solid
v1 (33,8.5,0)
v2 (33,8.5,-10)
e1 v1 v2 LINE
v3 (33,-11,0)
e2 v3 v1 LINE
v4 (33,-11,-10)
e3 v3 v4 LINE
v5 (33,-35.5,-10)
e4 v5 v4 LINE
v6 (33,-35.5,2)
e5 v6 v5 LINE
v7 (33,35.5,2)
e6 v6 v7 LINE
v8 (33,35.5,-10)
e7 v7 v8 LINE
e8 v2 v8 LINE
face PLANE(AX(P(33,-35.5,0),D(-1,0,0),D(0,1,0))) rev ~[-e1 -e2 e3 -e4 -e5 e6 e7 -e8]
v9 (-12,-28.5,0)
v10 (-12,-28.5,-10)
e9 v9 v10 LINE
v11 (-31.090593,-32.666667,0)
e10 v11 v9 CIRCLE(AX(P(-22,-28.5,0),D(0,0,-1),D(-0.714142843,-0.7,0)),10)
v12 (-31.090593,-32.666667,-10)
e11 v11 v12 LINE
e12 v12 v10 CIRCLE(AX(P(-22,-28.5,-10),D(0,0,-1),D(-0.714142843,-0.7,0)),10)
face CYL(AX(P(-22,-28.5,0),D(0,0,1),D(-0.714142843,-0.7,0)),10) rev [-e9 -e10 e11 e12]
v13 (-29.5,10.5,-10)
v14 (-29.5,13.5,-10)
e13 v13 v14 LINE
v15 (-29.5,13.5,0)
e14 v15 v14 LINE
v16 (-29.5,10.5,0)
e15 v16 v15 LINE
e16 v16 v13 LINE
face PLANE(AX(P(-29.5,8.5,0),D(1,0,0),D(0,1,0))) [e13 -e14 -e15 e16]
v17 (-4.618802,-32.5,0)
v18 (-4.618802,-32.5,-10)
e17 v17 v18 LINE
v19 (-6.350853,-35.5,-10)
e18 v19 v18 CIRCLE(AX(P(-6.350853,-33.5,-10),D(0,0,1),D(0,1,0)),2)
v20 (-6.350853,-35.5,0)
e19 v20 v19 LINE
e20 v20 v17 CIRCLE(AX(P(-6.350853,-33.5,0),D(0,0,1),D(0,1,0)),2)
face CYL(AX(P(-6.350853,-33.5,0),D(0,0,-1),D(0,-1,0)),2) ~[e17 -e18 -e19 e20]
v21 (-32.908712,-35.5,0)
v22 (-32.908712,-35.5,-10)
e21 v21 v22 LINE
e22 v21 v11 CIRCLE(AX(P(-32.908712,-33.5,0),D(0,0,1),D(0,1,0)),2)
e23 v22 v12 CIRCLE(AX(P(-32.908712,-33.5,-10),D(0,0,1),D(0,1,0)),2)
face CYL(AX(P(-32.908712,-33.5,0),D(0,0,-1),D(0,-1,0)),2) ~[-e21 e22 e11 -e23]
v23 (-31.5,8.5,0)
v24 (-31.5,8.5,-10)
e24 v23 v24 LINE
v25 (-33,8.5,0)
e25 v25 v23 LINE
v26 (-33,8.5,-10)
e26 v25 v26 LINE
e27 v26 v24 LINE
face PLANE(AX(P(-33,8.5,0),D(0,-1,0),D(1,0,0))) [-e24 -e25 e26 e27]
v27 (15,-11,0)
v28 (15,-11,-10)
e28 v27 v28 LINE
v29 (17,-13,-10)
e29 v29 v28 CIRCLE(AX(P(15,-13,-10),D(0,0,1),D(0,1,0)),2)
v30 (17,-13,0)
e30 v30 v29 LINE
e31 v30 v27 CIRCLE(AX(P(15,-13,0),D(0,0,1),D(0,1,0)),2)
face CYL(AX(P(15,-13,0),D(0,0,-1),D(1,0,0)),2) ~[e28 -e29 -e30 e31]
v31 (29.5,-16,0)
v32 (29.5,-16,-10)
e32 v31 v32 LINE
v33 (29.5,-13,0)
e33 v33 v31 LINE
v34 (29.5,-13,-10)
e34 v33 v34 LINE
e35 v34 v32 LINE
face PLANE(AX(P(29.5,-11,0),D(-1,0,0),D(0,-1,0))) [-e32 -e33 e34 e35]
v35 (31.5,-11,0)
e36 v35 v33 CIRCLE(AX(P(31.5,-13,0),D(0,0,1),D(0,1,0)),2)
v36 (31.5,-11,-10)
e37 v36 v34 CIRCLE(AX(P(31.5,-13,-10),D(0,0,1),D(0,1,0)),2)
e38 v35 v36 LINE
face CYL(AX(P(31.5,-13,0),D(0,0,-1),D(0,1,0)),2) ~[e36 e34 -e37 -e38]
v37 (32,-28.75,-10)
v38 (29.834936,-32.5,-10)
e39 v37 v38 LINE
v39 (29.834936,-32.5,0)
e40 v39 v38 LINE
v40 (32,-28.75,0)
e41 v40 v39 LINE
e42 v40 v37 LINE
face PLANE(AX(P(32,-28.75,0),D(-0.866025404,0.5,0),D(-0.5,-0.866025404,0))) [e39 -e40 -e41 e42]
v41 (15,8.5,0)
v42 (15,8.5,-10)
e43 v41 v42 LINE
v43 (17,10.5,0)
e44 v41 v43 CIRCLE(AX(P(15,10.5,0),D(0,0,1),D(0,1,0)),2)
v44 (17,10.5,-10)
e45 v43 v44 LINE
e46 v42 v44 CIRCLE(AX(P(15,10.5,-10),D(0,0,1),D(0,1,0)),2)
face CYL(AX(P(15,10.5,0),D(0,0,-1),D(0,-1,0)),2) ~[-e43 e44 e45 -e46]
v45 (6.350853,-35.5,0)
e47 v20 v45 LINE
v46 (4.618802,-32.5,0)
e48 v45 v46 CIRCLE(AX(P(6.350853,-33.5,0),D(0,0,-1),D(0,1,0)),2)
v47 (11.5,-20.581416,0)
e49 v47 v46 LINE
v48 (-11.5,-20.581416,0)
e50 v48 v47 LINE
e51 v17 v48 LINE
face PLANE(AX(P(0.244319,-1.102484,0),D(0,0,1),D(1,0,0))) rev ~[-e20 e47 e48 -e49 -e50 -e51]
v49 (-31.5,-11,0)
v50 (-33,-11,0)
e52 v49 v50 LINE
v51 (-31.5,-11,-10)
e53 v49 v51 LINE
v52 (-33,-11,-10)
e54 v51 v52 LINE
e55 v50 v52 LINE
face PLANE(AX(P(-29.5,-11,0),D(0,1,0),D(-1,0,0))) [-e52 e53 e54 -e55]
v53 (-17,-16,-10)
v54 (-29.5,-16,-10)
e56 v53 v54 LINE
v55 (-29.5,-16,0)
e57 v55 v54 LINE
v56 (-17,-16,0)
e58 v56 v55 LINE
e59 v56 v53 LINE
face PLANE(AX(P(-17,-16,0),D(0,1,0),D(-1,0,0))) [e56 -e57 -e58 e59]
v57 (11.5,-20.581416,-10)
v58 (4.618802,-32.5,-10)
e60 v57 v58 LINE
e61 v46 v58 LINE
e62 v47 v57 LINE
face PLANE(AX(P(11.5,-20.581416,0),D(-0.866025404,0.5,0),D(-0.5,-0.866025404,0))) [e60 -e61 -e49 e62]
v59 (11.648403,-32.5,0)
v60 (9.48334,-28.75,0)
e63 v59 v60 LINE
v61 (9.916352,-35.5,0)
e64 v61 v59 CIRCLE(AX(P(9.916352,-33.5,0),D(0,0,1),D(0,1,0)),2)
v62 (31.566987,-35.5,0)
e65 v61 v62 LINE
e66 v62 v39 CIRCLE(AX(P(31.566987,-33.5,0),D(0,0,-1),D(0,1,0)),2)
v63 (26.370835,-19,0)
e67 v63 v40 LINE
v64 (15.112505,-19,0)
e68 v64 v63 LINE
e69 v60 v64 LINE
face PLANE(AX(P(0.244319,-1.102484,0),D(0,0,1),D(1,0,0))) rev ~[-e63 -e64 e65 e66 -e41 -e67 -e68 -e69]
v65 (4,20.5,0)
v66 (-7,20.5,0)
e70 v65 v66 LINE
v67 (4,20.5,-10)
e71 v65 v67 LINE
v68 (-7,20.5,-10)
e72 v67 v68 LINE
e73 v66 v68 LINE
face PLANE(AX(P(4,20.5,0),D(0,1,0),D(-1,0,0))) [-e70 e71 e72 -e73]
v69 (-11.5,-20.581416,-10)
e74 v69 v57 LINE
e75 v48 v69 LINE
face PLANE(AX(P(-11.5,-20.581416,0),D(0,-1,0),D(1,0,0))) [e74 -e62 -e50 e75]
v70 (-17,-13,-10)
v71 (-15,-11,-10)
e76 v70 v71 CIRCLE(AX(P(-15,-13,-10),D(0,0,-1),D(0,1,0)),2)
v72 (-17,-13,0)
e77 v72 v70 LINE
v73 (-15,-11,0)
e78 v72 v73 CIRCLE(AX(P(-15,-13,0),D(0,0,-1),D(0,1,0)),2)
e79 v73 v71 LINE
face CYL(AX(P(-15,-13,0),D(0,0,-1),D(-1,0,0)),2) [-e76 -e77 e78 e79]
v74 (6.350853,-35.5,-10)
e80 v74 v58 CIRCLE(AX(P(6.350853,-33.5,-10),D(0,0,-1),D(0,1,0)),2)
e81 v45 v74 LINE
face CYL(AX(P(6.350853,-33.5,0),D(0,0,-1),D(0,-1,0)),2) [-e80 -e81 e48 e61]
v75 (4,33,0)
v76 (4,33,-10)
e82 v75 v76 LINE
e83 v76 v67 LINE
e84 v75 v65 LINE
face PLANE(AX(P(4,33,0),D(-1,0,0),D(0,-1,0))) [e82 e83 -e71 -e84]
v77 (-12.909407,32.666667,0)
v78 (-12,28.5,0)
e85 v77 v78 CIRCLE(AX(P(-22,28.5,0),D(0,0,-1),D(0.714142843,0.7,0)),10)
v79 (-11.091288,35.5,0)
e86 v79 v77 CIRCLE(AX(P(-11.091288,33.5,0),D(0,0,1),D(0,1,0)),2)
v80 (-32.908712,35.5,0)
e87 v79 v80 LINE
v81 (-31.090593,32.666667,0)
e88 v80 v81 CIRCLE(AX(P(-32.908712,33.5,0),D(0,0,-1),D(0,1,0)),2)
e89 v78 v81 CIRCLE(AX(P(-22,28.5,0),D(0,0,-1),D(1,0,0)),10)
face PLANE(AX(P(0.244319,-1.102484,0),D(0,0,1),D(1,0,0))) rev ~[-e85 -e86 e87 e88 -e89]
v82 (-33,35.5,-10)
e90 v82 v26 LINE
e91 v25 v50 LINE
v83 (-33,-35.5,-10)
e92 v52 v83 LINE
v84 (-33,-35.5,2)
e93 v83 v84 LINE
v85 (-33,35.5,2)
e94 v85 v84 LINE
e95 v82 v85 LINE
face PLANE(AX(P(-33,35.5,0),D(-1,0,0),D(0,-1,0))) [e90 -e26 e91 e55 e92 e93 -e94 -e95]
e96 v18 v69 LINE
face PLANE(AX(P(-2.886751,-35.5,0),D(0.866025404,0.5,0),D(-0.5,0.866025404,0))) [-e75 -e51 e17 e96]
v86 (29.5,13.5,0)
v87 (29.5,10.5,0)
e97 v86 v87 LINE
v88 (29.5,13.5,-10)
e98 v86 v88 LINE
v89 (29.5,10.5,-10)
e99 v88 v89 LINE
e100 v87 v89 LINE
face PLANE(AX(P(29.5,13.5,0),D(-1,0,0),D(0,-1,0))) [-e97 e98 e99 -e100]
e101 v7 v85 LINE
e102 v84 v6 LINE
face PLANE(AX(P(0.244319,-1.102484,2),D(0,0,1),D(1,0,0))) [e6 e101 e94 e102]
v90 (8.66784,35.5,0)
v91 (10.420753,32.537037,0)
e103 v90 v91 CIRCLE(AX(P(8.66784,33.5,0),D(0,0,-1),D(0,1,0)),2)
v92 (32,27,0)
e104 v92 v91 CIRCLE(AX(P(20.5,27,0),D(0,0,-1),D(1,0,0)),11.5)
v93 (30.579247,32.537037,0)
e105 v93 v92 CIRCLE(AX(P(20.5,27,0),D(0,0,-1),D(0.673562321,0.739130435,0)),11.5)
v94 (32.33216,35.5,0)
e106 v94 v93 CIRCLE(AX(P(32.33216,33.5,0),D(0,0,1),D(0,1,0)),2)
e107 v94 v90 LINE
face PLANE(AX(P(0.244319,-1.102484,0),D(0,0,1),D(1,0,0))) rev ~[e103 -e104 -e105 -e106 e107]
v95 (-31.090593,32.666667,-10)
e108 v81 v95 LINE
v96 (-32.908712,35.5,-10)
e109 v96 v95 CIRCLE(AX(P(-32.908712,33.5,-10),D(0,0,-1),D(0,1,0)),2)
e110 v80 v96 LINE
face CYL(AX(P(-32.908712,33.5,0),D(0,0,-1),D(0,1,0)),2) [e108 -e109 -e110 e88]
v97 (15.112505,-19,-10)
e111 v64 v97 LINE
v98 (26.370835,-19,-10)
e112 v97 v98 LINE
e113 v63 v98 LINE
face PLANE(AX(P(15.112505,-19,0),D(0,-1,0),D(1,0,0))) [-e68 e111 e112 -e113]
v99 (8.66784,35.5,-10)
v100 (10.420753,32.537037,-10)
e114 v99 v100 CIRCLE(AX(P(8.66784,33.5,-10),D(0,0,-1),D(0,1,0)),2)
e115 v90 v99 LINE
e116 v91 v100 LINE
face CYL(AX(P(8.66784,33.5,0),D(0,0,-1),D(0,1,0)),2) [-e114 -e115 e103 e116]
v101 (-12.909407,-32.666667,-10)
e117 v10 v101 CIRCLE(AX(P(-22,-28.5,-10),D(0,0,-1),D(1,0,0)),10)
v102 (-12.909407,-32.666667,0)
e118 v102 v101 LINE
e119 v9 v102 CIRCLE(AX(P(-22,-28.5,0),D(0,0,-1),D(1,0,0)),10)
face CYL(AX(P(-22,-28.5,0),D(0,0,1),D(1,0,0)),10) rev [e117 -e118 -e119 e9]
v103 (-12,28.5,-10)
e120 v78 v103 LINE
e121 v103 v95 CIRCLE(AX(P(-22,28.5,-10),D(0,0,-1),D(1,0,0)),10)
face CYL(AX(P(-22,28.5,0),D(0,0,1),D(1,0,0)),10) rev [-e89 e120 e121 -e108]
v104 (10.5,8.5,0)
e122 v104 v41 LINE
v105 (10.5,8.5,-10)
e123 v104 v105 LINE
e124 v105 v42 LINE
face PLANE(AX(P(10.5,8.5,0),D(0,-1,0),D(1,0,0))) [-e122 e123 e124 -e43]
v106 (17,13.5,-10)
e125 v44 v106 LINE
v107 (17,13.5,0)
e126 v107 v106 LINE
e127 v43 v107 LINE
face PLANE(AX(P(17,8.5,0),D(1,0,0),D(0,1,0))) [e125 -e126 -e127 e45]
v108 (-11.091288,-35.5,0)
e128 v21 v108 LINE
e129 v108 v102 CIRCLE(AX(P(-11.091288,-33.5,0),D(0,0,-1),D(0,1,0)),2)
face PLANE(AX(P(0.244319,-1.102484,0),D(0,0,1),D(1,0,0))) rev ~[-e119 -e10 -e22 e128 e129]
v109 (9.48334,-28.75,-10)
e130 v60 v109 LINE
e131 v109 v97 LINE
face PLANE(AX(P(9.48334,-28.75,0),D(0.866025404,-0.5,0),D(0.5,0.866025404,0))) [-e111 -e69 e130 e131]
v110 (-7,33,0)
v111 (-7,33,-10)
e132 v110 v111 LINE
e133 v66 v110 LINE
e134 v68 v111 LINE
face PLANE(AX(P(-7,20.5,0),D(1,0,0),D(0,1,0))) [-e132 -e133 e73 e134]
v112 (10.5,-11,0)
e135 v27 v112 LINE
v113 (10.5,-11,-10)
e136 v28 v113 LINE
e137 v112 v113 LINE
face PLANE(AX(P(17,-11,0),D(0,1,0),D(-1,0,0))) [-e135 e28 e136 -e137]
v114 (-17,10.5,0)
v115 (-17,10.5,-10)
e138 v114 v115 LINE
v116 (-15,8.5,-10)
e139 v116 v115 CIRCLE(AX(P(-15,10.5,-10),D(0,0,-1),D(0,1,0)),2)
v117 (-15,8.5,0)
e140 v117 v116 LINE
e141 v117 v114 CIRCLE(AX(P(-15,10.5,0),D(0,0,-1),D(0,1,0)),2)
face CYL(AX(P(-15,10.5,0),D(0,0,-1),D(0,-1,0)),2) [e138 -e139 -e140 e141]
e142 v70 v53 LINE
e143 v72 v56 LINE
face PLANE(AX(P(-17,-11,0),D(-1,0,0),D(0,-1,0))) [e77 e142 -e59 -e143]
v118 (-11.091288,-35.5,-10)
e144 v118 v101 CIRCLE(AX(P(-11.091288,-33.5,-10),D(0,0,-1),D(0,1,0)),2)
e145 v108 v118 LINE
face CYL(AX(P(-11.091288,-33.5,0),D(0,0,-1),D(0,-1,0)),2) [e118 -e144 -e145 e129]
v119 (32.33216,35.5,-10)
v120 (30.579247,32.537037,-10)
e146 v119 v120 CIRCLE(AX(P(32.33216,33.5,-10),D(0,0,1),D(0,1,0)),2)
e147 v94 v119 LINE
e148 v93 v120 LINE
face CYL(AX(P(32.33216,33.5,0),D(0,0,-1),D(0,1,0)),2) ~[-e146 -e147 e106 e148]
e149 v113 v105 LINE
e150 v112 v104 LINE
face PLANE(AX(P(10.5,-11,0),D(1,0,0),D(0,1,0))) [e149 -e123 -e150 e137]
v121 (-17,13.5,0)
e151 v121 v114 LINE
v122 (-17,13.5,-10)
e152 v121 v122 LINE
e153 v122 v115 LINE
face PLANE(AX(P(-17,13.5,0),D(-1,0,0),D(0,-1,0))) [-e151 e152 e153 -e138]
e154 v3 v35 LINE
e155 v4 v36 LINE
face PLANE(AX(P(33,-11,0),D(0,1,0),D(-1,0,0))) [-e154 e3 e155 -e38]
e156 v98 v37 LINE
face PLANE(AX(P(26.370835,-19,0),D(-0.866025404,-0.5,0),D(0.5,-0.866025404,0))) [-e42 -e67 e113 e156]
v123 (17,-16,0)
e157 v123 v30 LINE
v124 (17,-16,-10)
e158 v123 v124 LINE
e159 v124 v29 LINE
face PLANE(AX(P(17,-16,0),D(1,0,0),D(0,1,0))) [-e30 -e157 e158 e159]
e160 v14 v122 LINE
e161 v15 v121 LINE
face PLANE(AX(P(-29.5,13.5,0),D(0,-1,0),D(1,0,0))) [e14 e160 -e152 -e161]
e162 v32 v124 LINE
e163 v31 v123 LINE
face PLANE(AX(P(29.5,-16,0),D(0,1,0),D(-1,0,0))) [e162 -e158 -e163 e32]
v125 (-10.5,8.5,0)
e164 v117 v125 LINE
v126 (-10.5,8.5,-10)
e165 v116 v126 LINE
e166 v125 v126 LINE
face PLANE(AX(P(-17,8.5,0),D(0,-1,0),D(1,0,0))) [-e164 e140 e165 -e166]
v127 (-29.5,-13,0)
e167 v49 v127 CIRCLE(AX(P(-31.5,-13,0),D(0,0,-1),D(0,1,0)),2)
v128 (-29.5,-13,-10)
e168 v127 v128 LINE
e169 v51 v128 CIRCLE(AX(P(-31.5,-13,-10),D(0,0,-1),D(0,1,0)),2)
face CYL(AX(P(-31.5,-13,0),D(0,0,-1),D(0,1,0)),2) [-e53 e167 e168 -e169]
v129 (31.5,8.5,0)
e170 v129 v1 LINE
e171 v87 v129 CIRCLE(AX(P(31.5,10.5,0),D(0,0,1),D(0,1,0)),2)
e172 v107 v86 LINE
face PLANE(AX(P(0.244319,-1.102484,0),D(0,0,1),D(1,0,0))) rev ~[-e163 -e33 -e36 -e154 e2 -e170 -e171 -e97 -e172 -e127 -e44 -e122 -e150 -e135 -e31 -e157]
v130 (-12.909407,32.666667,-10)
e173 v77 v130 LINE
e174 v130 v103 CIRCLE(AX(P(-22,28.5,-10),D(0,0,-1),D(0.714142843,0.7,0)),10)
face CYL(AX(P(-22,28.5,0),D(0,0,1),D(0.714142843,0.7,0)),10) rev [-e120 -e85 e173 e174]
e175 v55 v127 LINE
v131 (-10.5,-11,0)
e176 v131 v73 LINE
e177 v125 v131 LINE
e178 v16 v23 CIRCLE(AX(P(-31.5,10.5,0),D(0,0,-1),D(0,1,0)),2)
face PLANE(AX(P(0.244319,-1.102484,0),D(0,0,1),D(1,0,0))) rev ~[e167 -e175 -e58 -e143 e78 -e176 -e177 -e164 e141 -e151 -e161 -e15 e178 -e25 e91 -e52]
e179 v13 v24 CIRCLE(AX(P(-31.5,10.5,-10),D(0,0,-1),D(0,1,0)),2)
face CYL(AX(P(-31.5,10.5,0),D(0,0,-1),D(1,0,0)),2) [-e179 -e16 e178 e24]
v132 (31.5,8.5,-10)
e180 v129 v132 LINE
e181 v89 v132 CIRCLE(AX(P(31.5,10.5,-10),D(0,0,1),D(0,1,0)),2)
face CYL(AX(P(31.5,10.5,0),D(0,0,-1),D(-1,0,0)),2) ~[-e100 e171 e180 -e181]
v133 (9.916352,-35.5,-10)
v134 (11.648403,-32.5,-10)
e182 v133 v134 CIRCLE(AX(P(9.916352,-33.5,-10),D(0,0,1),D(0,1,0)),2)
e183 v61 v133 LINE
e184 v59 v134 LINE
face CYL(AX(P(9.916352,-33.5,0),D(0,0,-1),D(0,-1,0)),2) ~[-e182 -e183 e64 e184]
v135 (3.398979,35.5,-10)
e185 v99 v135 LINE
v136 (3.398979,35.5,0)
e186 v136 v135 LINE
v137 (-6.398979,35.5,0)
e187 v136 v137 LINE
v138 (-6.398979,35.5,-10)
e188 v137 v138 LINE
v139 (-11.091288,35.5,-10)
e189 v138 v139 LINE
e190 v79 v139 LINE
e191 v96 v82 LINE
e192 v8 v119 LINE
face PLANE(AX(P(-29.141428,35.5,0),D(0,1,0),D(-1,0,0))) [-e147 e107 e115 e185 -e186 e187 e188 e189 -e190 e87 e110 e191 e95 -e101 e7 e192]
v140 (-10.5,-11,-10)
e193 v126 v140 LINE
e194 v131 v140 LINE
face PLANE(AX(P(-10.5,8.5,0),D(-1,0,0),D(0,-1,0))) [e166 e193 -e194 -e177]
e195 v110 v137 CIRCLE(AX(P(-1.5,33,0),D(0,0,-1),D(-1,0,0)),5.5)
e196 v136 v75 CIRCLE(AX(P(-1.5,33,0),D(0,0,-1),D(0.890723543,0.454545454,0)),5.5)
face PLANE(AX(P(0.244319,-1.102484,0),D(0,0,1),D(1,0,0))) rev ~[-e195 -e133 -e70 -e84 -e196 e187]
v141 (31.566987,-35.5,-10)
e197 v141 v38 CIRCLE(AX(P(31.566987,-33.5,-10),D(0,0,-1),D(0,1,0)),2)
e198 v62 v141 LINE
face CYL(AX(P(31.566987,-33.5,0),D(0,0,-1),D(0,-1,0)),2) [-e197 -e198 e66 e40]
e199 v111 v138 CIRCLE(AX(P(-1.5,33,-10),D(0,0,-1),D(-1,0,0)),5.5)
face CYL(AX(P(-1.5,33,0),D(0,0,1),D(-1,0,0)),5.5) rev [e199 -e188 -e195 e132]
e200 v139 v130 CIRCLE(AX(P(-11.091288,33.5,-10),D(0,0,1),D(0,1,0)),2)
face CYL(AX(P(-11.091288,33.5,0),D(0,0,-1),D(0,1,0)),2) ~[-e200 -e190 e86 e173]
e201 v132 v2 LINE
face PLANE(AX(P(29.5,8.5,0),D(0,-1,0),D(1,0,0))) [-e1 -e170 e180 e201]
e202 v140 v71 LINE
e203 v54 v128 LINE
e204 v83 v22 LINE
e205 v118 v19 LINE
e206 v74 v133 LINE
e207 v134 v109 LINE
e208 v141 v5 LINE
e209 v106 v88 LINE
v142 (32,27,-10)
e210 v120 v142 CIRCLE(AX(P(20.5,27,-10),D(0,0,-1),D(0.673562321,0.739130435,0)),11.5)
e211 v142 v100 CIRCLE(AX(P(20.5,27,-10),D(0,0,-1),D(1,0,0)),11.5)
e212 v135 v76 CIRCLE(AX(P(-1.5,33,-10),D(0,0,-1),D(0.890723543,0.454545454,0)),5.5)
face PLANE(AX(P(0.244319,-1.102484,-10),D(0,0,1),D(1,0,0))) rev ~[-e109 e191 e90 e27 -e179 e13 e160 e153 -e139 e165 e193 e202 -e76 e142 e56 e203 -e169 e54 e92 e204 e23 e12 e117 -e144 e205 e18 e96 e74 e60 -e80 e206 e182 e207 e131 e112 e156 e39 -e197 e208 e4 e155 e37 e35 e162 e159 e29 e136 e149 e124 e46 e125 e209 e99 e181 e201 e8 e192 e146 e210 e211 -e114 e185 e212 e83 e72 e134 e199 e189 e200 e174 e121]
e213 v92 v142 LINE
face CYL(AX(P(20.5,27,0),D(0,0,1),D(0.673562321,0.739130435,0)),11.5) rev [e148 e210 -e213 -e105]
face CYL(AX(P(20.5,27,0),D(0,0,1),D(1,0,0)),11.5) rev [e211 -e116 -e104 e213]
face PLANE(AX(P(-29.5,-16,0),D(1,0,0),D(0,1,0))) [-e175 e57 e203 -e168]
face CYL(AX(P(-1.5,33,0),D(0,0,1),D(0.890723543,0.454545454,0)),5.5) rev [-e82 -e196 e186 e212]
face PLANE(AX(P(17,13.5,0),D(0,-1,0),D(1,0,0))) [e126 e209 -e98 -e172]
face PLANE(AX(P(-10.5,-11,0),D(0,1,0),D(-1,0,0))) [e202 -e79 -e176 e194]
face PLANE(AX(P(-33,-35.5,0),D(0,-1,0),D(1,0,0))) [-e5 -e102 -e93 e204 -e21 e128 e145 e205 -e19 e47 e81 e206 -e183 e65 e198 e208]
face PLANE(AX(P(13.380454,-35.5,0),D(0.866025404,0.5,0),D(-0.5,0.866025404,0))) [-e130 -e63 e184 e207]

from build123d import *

# Parameters (mm, degrees)
F1_W     = 6.5
F1_H     = 19.5
F1_W_2   = 12.5
F1_H_2   = 5
F1_W_3   = 3.5
F2_DEPTH = 2
F3_DEPTH = 10
F4_R     = 2


# Not quite as in the source:
# - a feature names something its author has since deleted; it is built from what else it names


with BuildPart() as f2:
    # F1 (on Top) → F2 (new body)
    with BuildSketch(Plane.XY):
        with BuildLine():
            Line((-29.1414284285, 35.5), (-33, 35.5))
            Line((-33, 35.5), (-33, 8.5))
            Line((-33, 8.5), (-29.5, 8.5))
            Line((-29.5, 8.5), (-29.5, 13.5))
            Line((-29.5, 13.5), (-17, 13.5))
            Line((-17, 13.5), (-17, 8.5))
            Line((-17, 8.5), (-10.5, 8.5))
            Line((-10.5, 8.5), (-10.5, -11))
            Line((-10.5, -11), (-17, -11))
            Line((-17, -11), (-17, -16))
            Line((-17, -16), (-29.5, -16))
            Line((-29.5, -16), (-29.5, -11))
            Line((-29.5, -11), (-33, -11))
            Line((-33, -11), (-33, -35.5))
            Line((-33, -35.5), (-29.1414284285, -35.5))
            ThreePointArc((-29.1414284285, -35.5), (-25.7805896177, -19.2421848073), (-12, -28.5))
            ThreePointArc((-12, -28.5), (-12.7421848073, -32.2805896177), (-14.8585715715, -35.5))
            Line((-14.8585715715, -35.5), (-2.8867513459, -35.5))
            Line((-2.8867513459, -35.5), (-11.5, -20.581415713))
            Line((-11.5, -20.581415713), (11.5, -20.581415713))
            Line((11.5, -20.581415713), (2.8867513459, -35.5))
            Line((2.8867513459, -35.5), (13.3804538186, -35.5))
            Line((13.3804538186, -35.5), (9.4833395016, -28.75))
            Line((9.4833395016, -28.75), (15.1125046262, -19))
            Line((15.1125046262, -19), (26.3708348754, -19))
            Line((26.3708348754, -19), (32, -28.75))
            Line((32, -28.75), (28.102885683, -35.5))
            Line((28.102885683, -35.5), (33, -35.5))
            Line((33, -35.5), (33, -11))
            Line((33, -11), (29.5, -11))
            Line((29.5, -11), (29.5, -16))
            Line((29.5, -16), (17, -16))
            Line((17, -16), (17, -11))
            Line((17, -11), (10.5, -11))
            Line((10.5, -11), (10.5, 8.5))
            Line((10.5, 8.5), (17, 8.5))
            Line((17, 8.5), (17, 13.5))
            Line((17, 13.5), (29.5, 13.5))
            Line((29.5, 13.5), (29.5, 8.5))
            Line((29.5, 8.5), (33, 8.5))
            Line((33, 8.5), (33, 35.5))
            Line((33, 35.5), (28.2459666924, 35.5))
            ThreePointArc((28.2459666924, 35.5), (31.0197104752, 31.6460404129), (32, 27))
            ThreePointArc((32, 27), (15.8539595871, 16.4802895248), (12.7540333076, 35.5))
            Line((12.7540333076, 35.5), (3.3989794856, 35.5))
            ThreePointArc((3.3989794856, 35.5), (3.8476343915, 34.2856151892), (4, 33))
            Line((4, 33), (4, 20.5))
            Line((4, 20.5), (-7, 20.5))
            Line((-7, 20.5), (-7, 33))
            ThreePointArc((-7, 33), (-6.8476343915, 34.2856151892), (-6.3989794856, 35.5))
            Line((-6.3989794856, 35.5), (-14.8585715715, 35.5))
            ThreePointArc((-14.8585715715, 35.5), (-12.7421848073, 32.2805896177), (-12, 28.5))
            ThreePointArc((-12, 28.5), (-25.7805896177, 19.2421848073), (-29.1414284285, 35.5))
        make_face()
        with BuildLine():
            Line((-14.8585715715, 35.5), (-29.1414284285, 35.5))
            ThreePointArc((-29.1414284285, 35.5), (-25.7805896177, 19.2421848073), (-12, 28.5))
            ThreePointArc((-12, 28.5), (-12.7421848073, 32.2805896177), (-14.8585715715, 35.5))
        make_face()
        with BuildLine():
            ThreePointArc((-12, -28.5), (-25.7805896177, -19.2421848073), (-29.1414284285, -35.5))
            Line((-29.1414284285, -35.5), (-14.8585715715, -35.5))
            ThreePointArc((-14.8585715715, -35.5), (-12.7421848073, -32.2805896177), (-12, -28.5))
        make_face()
        Polygon((-11.5, -20.581415713), (-2.8867513459, -35.5), (2.8867513459, -35.5), (11.5, -20.581415713), align=None)
        with BuildLine():
            Line((28.2459666924, 35.5), (12.7540333076, 35.5))
            ThreePointArc((12.7540333076, 35.5), (15.8539595871, 16.4802895248), (32, 27))
            ThreePointArc((32, 27), (31.0197104752, 31.6460404129), (28.2459666924, 35.5))
        make_face()
        with BuildLine():
            Line((3.3989794856, 35.5), (-6.3989794856, 35.5))
            ThreePointArc((-6.3989794856, 35.5), (-6.8476343915, 34.2856151892), (-7, 33))
            Line((-7, 33), (4, 33))
            ThreePointArc((4, 33), (3.8476343915, 34.2856151892), (3.3989794856, 35.5))
        make_face()
        with BuildLine():
            Line((4, 33), (-7, 33))
            ThreePointArc((-7, 33), (-1.5, 27.5), (4, 33))
        make_face()
        with BuildLine():
            ThreePointArc((4, 33), (-1.5, 27.5), (-7, 33))
            Line((-7, 33), (-7, 20.5))
            Line((-7, 20.5), (4, 20.5))
            Line((4, 20.5), (4, 33))
        make_face()
        with Locations((13.75, -1.25)):
            Rectangle(F1_W, F1_H)
        with Locations((23.25, 11)):
            Rectangle(F1_W_2, F1_H_2)
        with Locations((23.25, -1.25)):
            Rectangle(F1_W_2, F1_H)
        with Locations((23.25, -13.5)):
            Rectangle(F1_W_2, F1_H_2)
        Polygon((9.4833395016, -28.75), (13.3804538186, -35.5), (28.102885683, -35.5), (32, -28.75), (26.3708348754, -19), (15.1125046262, -19), align=None)
        with Locations((31.25, -1.25)):
            Rectangle(F1_W_3, F1_H)
        with Locations((-31.25, -1.25)):
            Rectangle(F1_W_3, F1_H)
        with Locations((-23.25, -1.25)):
            Rectangle(F1_W_2, F1_H)
        with Locations((-13.75, -1.25)):
            Rectangle(F1_W, F1_H)
        with Locations((-23.25, 11)):
            Rectangle(F1_W_2, F1_H_2)
        with Locations((-23.25, -13.5)):
            Rectangle(F1_W_2, F1_H_2)
    extrude(amount=F2_DEPTH)

    # F1 (on Top) → F3 (join)
    with BuildSketch(Plane.XY):
        with BuildLine():
            Line((-29.1414284285, 35.5), (-33, 35.5))
            Line((-33, 35.5), (-33, 8.5))
            Line((-33, 8.5), (-29.5, 8.5))
            Line((-29.5, 8.5), (-29.5, 13.5))
            Line((-29.5, 13.5), (-17, 13.5))
            Line((-17, 13.5), (-17, 8.5))
            Line((-17, 8.5), (-10.5, 8.5))
            Line((-10.5, 8.5), (-10.5, -11))
            Line((-10.5, -11), (-17, -11))
            Line((-17, -11), (-17, -16))
            Line((-17, -16), (-29.5, -16))
            Line((-29.5, -16), (-29.5, -11))
            Line((-29.5, -11), (-33, -11))
            Line((-33, -11), (-33, -35.5))
            Line((-33, -35.5), (-29.1414284285, -35.5))
            ThreePointArc((-29.1414284285, -35.5), (-25.7805896177, -19.2421848073), (-12, -28.5))
            ThreePointArc((-12, -28.5), (-12.7421848073, -32.2805896177), (-14.8585715715, -35.5))
            Line((-14.8585715715, -35.5), (-2.8867513459, -35.5))
            Line((-2.8867513459, -35.5), (-11.5, -20.581415713))
            Line((-11.5, -20.581415713), (11.5, -20.581415713))
            Line((11.5, -20.581415713), (2.8867513459, -35.5))
            Line((2.8867513459, -35.5), (13.3804538186, -35.5))
            Line((13.3804538186, -35.5), (9.4833395016, -28.75))
            Line((9.4833395016, -28.75), (15.1125046262, -19))
            Line((15.1125046262, -19), (26.3708348754, -19))
            Line((26.3708348754, -19), (32, -28.75))
            Line((32, -28.75), (28.102885683, -35.5))
            Line((28.102885683, -35.5), (33, -35.5))
            Line((33, -35.5), (33, -11))
            Line((33, -11), (29.5, -11))
            Line((29.5, -11), (29.5, -16))
            Line((29.5, -16), (17, -16))
            Line((17, -16), (17, -11))
            Line((17, -11), (10.5, -11))
            Line((10.5, -11), (10.5, 8.5))
            Line((10.5, 8.5), (17, 8.5))
            Line((17, 8.5), (17, 13.5))
            Line((17, 13.5), (29.5, 13.5))
            Line((29.5, 13.5), (29.5, 8.5))
            Line((29.5, 8.5), (33, 8.5))
            Line((33, 8.5), (33, 35.5))
            Line((33, 35.5), (28.2459666924, 35.5))
            ThreePointArc((28.2459666924, 35.5), (31.0197104752, 31.6460404129), (32, 27))
            ThreePointArc((32, 27), (15.8539595871, 16.4802895248), (12.7540333076, 35.5))
            Line((12.7540333076, 35.5), (3.3989794856, 35.5))
            ThreePointArc((3.3989794856, 35.5), (3.8476343915, 34.2856151892), (4, 33))
            Line((4, 33), (4, 20.5))
            Line((4, 20.5), (-7, 20.5))
            Line((-7, 20.5), (-7, 33))
            ThreePointArc((-7, 33), (-6.8476343915, 34.2856151892), (-6.3989794856, 35.5))
            Line((-6.3989794856, 35.5), (-14.8585715715, 35.5))
            ThreePointArc((-14.8585715715, 35.5), (-12.7421848073, 32.2805896177), (-12, 28.5))
            ThreePointArc((-12, 28.5), (-25.7805896177, 19.2421848073), (-29.1414284285, 35.5))
        make_face()
    extrude(amount=-F3_DEPTH)

    # F4
    f4_edges = [f2.edges().sort_by_distance(p)[0] for p in [
        (-29.5, -11, -5),
        (-29.5, 8.5, -5),
        (-17, -11, -5),
        (-17, 8.5, -5),
        (17, -11, -5),
        (17, 8.5, -5),
        (29.5, -11, -5),
        (29.5, 8.5, -5),
        (-2.886751, -35.5, -5),
        (2.886751, -35.5, -5),
        (12.754033, 35.5, -5),
        (28.245967, 35.5, -5),
        (-29.141428, 35.5, -5),
        (-14.858572, 35.5, -5),
        (-29.141428, -35.5, -5),
        (-14.858572, -35.5, -5),
        (13.380454, -35.5, -5),
        (28.102886, -35.5, -5),
    ]]
    fillet(f4_edges, radius=F4_R)


solid = f2.part
